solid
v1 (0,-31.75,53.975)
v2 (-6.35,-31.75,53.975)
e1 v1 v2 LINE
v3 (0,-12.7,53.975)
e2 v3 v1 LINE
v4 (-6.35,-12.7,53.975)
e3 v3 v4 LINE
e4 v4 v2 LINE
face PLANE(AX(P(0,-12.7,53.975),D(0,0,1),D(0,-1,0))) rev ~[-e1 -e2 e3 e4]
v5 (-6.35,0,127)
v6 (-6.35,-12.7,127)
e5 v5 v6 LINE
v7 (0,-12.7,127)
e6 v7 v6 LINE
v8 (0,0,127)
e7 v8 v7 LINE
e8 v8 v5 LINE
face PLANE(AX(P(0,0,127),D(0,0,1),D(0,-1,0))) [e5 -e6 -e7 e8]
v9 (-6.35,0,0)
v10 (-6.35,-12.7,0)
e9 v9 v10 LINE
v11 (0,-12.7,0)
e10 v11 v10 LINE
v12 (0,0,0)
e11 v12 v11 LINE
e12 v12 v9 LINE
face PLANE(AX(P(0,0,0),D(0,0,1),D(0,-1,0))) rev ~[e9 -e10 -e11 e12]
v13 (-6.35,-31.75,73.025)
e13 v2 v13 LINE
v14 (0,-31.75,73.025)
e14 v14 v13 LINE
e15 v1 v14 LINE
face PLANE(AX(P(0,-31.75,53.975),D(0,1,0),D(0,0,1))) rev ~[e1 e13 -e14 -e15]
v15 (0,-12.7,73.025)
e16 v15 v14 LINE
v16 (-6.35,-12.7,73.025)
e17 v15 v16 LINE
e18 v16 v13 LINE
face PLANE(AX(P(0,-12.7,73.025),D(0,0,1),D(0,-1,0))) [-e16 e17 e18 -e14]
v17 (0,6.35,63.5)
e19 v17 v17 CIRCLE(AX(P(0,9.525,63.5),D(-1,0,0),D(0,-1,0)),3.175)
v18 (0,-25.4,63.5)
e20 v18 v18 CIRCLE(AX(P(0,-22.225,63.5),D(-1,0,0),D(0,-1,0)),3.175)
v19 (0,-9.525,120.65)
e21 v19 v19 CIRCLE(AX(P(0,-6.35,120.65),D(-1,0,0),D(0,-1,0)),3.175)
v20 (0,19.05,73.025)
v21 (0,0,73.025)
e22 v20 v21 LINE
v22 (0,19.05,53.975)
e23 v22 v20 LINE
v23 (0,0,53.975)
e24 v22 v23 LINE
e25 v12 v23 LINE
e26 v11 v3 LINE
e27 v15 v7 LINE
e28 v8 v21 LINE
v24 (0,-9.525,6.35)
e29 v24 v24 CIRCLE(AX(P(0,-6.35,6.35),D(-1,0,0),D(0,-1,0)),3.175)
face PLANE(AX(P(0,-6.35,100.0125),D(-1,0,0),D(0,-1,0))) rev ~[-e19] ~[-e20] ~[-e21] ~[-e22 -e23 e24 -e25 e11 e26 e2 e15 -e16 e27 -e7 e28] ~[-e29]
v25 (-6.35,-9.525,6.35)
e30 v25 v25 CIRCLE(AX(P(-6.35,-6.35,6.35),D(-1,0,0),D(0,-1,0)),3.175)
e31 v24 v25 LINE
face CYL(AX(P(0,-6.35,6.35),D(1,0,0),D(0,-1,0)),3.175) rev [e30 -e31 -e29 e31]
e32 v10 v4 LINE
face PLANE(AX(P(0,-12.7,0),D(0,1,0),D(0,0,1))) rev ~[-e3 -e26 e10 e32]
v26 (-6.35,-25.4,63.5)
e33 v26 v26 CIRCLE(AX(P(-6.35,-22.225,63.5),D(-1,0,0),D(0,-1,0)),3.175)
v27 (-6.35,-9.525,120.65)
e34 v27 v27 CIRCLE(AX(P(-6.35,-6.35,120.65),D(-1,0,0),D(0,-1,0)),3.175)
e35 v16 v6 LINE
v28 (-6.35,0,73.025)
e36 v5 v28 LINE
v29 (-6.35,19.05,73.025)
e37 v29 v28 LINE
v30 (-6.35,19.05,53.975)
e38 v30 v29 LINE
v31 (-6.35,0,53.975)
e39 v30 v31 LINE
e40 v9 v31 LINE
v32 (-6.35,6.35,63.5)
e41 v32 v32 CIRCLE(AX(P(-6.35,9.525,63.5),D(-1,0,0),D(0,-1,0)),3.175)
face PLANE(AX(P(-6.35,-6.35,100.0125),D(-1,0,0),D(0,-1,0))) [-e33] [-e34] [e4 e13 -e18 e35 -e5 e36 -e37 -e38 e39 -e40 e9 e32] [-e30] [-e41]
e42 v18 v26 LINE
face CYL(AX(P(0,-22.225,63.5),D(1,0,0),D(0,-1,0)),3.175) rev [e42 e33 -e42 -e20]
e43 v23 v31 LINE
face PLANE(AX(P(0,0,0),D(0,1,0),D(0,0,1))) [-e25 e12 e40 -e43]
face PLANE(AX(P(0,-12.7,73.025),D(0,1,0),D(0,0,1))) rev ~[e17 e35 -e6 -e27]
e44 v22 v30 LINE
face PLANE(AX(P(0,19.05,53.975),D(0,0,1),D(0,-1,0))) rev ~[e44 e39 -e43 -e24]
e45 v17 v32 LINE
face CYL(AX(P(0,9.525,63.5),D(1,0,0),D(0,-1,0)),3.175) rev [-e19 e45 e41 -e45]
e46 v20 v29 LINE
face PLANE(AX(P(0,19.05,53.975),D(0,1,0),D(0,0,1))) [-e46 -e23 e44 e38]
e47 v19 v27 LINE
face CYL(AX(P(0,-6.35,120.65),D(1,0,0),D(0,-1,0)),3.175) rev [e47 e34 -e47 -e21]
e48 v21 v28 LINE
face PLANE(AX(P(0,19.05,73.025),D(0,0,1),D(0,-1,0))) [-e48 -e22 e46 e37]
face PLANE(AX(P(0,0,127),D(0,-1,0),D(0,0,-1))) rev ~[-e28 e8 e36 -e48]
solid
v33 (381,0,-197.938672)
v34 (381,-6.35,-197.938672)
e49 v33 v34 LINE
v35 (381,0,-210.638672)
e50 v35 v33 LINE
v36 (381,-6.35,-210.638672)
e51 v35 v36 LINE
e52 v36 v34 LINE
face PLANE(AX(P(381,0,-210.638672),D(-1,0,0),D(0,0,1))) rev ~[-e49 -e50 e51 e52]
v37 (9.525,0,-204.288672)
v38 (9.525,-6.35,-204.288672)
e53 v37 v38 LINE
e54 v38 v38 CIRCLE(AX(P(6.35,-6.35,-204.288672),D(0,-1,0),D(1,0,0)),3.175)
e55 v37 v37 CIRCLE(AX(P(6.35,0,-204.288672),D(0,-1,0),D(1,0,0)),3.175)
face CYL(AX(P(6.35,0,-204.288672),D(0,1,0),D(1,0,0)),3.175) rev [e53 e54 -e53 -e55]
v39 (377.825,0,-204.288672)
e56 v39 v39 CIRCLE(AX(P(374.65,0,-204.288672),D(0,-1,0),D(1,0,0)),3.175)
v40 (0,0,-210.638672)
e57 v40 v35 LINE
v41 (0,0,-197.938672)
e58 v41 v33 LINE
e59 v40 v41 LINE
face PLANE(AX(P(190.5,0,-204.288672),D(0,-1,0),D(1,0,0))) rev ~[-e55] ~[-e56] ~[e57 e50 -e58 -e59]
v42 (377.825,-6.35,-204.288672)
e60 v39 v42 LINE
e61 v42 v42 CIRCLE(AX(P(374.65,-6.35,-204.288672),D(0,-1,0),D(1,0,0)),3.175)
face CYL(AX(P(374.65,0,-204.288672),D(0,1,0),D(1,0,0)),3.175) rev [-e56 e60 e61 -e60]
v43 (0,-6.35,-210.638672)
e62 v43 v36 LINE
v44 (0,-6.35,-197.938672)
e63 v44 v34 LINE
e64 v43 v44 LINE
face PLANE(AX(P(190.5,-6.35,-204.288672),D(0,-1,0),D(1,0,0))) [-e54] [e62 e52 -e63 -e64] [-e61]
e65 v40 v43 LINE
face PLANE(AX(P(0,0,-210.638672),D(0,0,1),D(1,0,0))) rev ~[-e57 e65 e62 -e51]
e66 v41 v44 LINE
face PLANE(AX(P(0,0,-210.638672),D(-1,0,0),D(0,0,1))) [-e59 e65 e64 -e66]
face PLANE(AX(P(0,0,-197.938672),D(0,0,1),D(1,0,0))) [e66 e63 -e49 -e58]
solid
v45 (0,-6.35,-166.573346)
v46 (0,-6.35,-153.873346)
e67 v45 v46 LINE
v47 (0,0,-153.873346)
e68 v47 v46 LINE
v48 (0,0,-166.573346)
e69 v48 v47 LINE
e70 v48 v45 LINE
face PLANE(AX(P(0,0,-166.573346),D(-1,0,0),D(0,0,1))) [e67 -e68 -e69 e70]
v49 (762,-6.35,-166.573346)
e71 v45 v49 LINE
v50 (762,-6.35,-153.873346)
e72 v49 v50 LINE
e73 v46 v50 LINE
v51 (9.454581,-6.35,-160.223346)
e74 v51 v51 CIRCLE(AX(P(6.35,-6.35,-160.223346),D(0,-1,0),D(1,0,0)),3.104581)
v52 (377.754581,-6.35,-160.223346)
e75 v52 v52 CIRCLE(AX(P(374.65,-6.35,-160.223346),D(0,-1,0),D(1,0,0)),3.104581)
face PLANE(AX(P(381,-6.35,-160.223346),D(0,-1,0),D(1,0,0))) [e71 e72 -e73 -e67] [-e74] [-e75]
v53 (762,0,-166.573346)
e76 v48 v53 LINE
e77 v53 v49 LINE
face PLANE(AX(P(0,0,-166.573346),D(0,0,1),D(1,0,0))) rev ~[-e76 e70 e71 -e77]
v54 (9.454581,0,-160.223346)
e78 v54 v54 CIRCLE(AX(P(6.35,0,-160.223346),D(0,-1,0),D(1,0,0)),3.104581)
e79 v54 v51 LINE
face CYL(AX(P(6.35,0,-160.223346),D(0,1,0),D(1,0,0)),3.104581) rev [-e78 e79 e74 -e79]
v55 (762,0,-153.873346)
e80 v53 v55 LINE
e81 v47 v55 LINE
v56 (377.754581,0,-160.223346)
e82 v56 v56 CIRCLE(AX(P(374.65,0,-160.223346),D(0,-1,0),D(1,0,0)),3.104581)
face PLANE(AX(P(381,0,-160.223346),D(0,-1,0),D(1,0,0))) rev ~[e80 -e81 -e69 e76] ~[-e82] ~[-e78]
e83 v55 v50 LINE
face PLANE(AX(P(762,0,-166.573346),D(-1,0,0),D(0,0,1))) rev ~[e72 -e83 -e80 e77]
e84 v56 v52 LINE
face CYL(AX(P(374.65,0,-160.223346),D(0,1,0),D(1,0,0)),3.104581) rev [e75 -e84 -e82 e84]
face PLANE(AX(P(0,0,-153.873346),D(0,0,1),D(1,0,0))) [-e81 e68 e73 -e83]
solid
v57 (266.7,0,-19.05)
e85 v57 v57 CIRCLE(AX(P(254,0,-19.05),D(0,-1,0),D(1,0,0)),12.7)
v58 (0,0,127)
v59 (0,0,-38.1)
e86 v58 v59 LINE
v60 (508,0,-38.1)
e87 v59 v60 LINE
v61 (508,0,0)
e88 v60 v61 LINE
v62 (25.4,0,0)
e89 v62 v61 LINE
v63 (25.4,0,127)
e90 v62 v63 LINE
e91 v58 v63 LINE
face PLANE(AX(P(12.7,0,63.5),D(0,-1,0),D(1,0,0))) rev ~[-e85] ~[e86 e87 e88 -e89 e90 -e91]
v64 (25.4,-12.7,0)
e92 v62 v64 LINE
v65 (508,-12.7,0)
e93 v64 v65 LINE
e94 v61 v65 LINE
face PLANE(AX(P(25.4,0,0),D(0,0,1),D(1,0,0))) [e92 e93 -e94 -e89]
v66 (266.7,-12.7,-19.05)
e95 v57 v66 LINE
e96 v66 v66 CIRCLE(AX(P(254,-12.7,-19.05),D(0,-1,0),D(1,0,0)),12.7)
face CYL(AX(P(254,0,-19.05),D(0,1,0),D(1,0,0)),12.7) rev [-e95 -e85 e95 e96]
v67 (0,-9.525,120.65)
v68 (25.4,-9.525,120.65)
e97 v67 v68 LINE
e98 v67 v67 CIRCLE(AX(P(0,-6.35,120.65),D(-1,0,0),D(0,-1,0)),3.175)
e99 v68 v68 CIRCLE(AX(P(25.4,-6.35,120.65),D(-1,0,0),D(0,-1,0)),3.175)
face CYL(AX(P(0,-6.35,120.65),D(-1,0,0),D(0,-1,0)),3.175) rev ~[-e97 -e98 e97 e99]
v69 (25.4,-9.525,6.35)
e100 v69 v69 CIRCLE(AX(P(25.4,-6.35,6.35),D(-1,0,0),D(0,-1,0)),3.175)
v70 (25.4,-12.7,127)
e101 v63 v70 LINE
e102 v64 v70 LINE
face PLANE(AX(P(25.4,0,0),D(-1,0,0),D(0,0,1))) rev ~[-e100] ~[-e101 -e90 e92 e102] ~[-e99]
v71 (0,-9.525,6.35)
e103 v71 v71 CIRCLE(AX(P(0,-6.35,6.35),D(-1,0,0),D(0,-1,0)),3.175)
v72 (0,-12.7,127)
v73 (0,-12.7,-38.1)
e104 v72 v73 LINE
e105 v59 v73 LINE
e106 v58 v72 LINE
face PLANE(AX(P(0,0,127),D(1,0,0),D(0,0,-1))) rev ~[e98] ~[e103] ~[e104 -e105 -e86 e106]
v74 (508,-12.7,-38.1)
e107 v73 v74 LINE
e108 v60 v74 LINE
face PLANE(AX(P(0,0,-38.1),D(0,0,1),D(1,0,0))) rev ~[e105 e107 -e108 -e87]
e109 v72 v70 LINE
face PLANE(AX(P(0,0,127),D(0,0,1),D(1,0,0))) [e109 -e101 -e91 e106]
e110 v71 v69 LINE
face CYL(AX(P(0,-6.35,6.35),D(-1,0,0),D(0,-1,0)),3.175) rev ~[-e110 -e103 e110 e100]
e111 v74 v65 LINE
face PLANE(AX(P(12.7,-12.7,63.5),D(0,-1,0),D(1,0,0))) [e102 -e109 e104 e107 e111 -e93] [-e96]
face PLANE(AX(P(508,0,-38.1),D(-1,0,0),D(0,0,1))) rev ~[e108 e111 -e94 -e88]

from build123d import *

# Parameters (mm, degrees)
F0_W     = 25.4
F0_H     = 127
F0_H_2   = 38.1
F0_W_2   = 482.6
F0_R     = 12.7
F1_DEPTH = 12.7
F2_R     = 3.175
F3_DEPTH = 25.4
F2_W     = 12.7
F2_H     = 53.975
F2_H_2   = 19.05
F2_W_2   = 19.05
F4_DEPTH = 6.35
F0_W_3   = 762
F0_H_3   = 12.7
F0_R_2   = 3.1045805256
F5_DEPTH = 6.35
F0_W_4   = 381
F0_R_3   = 3.175


with BuildPart() as f1:
    # F0 (on Front) → F1 (new body)
    with BuildSketch(Plane.XZ):
        with Locations((12.7, 63.5)):
            Rectangle(F0_W, F0_H)
        with Locations((12.7, -19.05)):
            Rectangle(F0_W, F0_H_2)
        with Locations((266.7, -19.05)):
            Rectangle(F0_W_2, F0_H_2)
        with Locations((254, -19.05)):
            Circle(F0_R, mode=Mode.SUBTRACT)
    extrude(amount=F1_DEPTH)

    # F2 (on face) → F3 (cut)
    with BuildSketch(Plane(origin=(0, 0, 0), x_dir=(0, -1, 0), z_dir=(-1, 0, 0))):
        with Locations((6.35, 120.65)):
            Circle(F2_R)
        with Locations((6.35, 6.35)):
            Circle(F2_R)
    extrude(amount=-F3_DEPTH, mode=Mode.SUBTRACT)


with BuildPart() as f4:
    # F2 (on face) → F4 (new body)
    with BuildSketch(Plane(origin=(0, 0, 0), x_dir=(0, -1, 0), z_dir=(-1, 0, 0))):
        with Locations((6.35, 100.0125)):
            Rectangle(F2_W, F2_H)
        with Locations((6.35, 120.65)):
            Circle(F2_R, mode=Mode.SUBTRACT)
        with Locations((6.35, 63.5)):
            Rectangle(F2_W, F2_H_2)
        with Locations((-9.525, 63.5)):
            Rectangle(F2_W_2, F2_H_2)
        with Locations((-9.525, 63.5)):
            Circle(F2_R, mode=Mode.SUBTRACT)
        with Locations((22.225, 63.5)):
            Rectangle(F2_W_2, F2_H_2)
        with Locations((22.225, 63.5)):
            Circle(F2_R, mode=Mode.SUBTRACT)
        with Locations((6.35, 26.9875)):
            Rectangle(F2_W, F2_H)
        with Locations((6.35, 6.35)):
            Circle(F2_R, mode=Mode.SUBTRACT)
    extrude(amount=F4_DEPTH)


with BuildPart() as f5:
    # F0 (on Front) → F5 (new body)
    with BuildSketch(Plane.XZ):
        with Locations((381, -160.2233456612)):
            Rectangle(F0_W_3, F0_H_3)
        with Locations((6.35, -160.2233456612)):
            Circle(F0_R_2, mode=Mode.SUBTRACT)
        with Locations((374.65, -160.2233456612)):
            Circle(F0_R_2, mode=Mode.SUBTRACT)
    extrude(amount=F5_DEPTH)


with BuildPart() as f5b:
    # F0 (on Front) → F5, piece 2 (new body)
    with BuildSketch(Plane.XZ):
        with Locations((190.5, -204.2886721134)):
            Rectangle(F0_W_4, F0_H_3)
        with Locations((6.35, -204.2886721134)):
            Circle(F0_R_3, mode=Mode.SUBTRACT)
        with Locations((374.65, -204.2886721134)):
            Circle(F0_R_3, mode=Mode.SUBTRACT)
    extrude(amount=F5_DEPTH)


solid = Compound([f1.part, f4.part, f5.part, f5b.part])
